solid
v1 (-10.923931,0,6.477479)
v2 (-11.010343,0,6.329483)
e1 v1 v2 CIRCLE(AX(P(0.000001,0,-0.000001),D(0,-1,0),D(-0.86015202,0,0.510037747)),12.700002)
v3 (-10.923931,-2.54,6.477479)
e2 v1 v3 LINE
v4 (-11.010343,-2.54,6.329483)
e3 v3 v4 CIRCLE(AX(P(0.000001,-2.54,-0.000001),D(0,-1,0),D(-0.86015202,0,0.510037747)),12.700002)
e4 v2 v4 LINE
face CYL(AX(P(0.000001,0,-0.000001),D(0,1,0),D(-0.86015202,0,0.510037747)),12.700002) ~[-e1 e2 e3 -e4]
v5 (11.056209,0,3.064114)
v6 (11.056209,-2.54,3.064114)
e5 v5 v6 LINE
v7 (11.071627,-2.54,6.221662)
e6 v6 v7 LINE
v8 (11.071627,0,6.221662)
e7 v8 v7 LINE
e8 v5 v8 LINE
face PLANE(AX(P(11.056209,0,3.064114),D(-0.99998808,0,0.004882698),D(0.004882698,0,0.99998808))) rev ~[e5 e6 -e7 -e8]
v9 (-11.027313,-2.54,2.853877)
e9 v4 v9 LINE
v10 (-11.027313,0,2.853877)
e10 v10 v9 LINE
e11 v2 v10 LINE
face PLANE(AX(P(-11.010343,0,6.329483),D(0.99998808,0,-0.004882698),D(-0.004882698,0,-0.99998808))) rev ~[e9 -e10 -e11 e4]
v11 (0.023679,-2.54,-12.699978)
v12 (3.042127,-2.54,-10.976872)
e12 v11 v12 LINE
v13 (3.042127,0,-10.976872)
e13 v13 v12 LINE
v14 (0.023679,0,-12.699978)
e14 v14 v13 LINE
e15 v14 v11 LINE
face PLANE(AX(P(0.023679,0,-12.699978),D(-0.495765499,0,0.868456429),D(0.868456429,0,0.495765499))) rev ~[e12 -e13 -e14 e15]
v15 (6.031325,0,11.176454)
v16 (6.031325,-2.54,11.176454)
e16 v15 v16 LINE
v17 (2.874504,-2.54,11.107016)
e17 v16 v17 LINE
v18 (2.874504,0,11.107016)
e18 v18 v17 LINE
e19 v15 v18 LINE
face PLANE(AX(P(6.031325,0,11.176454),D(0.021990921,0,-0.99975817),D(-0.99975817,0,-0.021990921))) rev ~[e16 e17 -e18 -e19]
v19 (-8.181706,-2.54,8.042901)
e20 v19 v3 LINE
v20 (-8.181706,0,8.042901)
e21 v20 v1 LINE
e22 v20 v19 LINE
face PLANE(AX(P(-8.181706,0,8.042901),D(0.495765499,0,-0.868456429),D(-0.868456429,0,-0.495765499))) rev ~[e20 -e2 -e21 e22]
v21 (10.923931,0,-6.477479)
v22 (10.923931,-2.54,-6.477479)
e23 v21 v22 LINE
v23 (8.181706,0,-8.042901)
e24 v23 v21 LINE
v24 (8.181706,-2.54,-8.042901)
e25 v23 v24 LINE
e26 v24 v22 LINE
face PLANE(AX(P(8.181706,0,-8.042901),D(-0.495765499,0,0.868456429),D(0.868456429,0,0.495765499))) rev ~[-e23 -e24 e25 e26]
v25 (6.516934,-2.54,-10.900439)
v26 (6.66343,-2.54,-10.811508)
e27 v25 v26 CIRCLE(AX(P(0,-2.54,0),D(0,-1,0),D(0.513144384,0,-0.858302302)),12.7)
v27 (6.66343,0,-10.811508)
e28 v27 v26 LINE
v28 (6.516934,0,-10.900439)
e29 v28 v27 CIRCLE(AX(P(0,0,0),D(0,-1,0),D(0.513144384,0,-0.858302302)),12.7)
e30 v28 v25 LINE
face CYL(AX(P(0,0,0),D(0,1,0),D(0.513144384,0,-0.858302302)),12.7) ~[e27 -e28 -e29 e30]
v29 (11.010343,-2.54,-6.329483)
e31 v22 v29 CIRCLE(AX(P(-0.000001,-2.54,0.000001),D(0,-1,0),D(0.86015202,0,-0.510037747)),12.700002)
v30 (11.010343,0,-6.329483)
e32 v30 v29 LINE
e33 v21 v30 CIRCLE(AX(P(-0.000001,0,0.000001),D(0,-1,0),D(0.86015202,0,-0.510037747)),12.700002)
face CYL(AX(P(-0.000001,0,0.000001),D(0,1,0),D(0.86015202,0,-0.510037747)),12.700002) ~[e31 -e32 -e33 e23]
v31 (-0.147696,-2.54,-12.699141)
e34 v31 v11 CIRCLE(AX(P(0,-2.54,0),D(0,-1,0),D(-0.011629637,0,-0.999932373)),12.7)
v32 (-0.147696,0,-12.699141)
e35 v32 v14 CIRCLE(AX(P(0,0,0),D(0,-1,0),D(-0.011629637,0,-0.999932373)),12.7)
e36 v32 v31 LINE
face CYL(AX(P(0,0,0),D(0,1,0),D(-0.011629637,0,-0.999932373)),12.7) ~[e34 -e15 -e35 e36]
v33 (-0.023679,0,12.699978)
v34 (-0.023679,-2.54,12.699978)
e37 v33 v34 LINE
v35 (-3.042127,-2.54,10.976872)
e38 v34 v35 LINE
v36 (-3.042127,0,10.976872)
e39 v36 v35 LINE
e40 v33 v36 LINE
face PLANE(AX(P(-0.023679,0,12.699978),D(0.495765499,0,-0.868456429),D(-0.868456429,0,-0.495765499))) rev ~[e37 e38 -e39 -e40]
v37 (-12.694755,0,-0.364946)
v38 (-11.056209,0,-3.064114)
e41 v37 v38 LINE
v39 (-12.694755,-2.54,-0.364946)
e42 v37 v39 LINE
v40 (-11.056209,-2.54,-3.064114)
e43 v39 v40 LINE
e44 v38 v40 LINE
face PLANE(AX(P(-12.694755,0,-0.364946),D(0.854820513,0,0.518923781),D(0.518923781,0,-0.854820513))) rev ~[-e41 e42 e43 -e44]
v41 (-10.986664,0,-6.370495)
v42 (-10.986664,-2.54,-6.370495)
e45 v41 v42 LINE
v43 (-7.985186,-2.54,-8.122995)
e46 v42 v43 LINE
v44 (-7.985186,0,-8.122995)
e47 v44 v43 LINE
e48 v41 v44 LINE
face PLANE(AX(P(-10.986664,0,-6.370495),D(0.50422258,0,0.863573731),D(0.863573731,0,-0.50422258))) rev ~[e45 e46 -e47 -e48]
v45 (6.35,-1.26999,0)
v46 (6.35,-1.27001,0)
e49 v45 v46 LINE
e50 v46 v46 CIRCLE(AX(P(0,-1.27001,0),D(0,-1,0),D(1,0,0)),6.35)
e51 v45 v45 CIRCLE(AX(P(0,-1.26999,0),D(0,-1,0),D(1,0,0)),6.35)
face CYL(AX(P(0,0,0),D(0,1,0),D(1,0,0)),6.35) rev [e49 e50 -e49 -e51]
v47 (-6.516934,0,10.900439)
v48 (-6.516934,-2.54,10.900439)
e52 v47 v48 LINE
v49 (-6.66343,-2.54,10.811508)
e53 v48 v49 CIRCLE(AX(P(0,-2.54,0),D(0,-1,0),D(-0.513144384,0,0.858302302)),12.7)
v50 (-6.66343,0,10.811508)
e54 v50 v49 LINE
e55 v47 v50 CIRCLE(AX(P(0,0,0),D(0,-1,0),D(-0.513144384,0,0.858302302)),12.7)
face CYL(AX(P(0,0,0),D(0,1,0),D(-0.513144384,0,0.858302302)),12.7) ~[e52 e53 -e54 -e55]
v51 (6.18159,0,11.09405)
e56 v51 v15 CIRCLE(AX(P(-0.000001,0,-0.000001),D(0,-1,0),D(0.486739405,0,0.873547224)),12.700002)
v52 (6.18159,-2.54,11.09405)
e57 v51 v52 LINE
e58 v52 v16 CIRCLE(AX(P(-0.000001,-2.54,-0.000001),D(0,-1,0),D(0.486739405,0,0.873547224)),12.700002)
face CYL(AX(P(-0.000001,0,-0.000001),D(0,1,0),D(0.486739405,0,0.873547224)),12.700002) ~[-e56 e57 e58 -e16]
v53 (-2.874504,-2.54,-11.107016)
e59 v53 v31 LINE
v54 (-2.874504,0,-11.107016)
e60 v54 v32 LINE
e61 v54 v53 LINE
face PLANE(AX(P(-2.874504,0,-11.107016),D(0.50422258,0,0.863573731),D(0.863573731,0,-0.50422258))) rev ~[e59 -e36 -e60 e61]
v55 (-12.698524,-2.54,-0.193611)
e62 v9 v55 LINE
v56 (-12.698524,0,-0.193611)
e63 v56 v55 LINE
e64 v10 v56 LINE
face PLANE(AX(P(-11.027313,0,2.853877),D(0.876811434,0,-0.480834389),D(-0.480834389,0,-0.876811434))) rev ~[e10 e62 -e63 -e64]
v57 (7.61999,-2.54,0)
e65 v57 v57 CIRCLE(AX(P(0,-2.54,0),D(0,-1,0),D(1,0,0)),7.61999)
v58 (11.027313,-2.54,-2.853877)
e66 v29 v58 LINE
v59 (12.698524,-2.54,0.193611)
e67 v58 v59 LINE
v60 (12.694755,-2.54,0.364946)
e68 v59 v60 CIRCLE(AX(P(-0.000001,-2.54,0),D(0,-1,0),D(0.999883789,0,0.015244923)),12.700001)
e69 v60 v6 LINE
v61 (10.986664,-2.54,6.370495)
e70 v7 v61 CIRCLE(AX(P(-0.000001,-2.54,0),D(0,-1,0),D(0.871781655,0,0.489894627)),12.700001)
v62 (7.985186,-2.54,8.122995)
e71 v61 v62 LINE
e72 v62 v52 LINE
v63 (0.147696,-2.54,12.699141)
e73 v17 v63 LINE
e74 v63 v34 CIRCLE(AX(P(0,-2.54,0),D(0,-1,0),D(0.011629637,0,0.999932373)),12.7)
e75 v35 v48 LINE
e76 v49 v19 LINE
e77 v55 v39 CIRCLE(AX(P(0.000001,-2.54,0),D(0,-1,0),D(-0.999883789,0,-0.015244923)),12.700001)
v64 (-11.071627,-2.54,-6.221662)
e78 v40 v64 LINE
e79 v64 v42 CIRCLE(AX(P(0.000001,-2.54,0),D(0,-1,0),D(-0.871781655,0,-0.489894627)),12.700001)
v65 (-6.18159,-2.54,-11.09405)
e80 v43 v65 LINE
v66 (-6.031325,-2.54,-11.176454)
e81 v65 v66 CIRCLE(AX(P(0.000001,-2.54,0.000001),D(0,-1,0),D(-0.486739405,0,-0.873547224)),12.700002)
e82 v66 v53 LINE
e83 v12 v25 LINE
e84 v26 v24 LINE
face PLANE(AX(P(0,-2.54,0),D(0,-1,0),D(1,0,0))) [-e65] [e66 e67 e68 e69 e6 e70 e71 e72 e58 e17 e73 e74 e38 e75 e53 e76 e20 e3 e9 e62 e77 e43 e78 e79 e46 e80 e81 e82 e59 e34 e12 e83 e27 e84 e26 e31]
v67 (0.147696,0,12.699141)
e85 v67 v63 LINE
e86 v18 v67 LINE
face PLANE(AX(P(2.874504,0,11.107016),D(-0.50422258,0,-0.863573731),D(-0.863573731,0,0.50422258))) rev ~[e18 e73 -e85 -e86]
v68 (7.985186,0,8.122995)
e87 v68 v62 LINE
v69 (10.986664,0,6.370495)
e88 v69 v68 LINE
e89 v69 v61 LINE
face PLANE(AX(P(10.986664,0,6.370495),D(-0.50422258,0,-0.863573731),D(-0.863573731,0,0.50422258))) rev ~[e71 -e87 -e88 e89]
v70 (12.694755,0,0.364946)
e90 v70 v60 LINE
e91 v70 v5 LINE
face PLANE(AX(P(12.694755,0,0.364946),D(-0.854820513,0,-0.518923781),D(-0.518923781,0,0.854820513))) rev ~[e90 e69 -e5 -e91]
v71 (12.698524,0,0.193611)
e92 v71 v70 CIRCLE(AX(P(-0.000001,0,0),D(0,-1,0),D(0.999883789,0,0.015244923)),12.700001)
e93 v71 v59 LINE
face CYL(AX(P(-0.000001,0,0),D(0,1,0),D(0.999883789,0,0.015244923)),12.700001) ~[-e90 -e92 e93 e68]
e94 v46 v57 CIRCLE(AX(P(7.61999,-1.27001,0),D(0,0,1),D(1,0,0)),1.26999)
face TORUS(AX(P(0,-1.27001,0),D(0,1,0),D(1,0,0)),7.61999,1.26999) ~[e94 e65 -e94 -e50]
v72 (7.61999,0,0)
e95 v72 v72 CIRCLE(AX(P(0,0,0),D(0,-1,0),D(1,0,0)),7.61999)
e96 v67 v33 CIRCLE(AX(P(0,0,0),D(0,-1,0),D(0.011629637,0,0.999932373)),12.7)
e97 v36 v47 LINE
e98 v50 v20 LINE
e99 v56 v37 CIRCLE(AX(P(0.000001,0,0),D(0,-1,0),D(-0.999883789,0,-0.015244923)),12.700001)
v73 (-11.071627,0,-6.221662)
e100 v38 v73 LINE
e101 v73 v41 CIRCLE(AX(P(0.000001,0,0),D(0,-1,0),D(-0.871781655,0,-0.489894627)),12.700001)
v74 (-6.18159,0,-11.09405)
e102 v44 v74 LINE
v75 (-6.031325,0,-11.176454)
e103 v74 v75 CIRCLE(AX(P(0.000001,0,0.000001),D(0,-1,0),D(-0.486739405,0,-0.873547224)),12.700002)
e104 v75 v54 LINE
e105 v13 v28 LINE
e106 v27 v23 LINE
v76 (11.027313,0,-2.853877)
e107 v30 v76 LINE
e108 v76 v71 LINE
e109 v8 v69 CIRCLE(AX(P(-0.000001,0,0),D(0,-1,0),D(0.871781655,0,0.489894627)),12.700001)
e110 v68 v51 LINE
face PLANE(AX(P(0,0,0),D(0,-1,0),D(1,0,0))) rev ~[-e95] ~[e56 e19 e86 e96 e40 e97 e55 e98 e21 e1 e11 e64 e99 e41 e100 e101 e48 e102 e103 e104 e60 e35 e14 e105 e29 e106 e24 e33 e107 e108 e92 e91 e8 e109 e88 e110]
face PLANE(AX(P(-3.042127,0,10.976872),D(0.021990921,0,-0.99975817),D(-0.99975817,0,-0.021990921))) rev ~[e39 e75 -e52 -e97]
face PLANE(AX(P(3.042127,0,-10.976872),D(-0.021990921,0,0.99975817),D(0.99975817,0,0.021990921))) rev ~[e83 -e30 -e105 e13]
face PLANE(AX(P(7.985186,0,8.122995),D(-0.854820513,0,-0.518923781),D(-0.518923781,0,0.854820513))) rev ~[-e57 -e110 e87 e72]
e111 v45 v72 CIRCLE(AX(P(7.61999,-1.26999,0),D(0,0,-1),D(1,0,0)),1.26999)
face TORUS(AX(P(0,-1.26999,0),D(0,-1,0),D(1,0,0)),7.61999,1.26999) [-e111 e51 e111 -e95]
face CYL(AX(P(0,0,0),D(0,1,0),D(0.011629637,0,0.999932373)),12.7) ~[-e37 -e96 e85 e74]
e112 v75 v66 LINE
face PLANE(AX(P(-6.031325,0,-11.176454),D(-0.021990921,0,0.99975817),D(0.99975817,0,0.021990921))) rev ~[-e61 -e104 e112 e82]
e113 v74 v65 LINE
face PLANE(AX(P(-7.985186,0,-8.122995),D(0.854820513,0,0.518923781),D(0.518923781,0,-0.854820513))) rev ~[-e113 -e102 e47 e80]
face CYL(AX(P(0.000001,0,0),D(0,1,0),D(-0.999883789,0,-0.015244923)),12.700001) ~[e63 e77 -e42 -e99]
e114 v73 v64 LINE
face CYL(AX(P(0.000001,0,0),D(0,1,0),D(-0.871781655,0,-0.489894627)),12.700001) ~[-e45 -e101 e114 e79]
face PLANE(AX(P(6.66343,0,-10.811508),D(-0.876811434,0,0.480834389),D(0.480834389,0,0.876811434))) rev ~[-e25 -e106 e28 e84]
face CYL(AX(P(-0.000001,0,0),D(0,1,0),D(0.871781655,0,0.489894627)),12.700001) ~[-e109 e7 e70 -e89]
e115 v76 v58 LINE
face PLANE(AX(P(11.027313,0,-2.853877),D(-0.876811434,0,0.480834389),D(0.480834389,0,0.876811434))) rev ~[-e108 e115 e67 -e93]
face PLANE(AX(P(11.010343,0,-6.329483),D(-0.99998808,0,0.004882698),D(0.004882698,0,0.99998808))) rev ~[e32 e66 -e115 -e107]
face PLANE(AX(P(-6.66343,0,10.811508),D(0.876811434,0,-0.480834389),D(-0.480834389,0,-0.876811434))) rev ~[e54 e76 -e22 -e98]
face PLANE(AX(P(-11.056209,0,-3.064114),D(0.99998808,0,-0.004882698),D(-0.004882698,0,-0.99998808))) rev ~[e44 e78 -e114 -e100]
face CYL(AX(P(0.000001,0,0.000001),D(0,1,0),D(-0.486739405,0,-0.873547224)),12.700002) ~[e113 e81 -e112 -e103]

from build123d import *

# Parameters (mm, degrees)
F0_R     = 6.35
F1_DEPTH = 2.54
F2_R     = 1.26999


# Not quite as in the source:
# - a fillet or chamfer is up to 0.001 mm smaller than in the source, because OpenCascade refuses the exact size


with BuildPart() as f1:
    # F0 (on Front) → F1 (new body)
    with BuildSketch(Plane.XZ):
        Polygon((8.1817057439, -8.042901042), (11.0273133855, -2.8538767742), (11.0562094944, 3.0641144995), (7.9851864785, 8.1229951402), (2.8745037505, 11.1070155415), (-3.042126907, 10.9768719144), (-8.1817057439, 8.042901042), (-11.0273133855, 2.8538767742), (-11.0562094944, -3.0641144995), (-7.9851864785, -8.1229951402), (-2.8745037505, -11.1070155415), (3.042126907, -10.9768719144), align=None)
        Circle(F0_R, mode=Mode.SUBTRACT)
        with BuildLine():
            Line((-3.042126907, 10.9768719144), (2.8745037505, 11.1070155415))
            Line((2.8745037505, 11.1070155415), (0.1476963834, 12.6991411433))
            ThreePointArc((0.1476963834, 12.6991411433), (0.0620102654, 12.6998486104), (-0.0236786756, 12.699977926))
            Line((-0.0236786756, 12.699977926), (-3.042126907, 10.9768719144))
        make_face()
        with BuildLine():
            Line((-8.1817057439, 8.042901042), (-3.042126907, 10.9768719144))
            Line((-3.042126907, 10.9768719144), (-6.5169336782, 10.9004392312))
            ThreePointArc((-6.5169336782, 10.9004392312), (-6.5903320193, 10.8562205152), (-6.6634303404, 10.8115075775))
            Line((-6.6634303404, 10.8115075775), (-8.1817057439, 8.042901042))
        make_face()
        with BuildLine():
            Line((-11.0273133855, 2.8538767742), (-8.1817057439, 8.042901042))
            Line((-8.1817057439, 8.042901042), (-10.9239306447, 6.4774793917))
            ThreePointArc((-10.9239306447, 6.4774793917), (-10.9673863881, 6.4036267703), (-11.0103428492, 6.3294826284))
            Line((-11.0103428492, 6.3294826284), (-11.0273133855, 2.8538767742))
        make_face()
        with BuildLine():
            Line((-12.6947553855, -0.3649461623), (-11.0562094944, -3.0641144995))
            Line((-11.0562094944, -3.0641144995), (-11.0273133855, 2.8538767742))
            Line((-11.0273133855, 2.8538767742), (-12.6985241258, -0.1936105045))
            ThreePointArc((-12.6985241258, -0.1936105045), (-12.6969287649, -0.2792846905), (-12.6947553855, -0.3649461623))
        make_face()
        with BuildLine():
            Line((-10.9866641736, -6.3704952976), (-7.9851864785, -8.1229951402))
            Line((-7.9851864785, -8.1229951402), (-11.0562094944, -3.0641144995))
            Line((-11.0562094944, -3.0641144995), (-11.0716270281, -6.2216617516))
            ThreePointArc((-11.0716270281, -6.2216617516), (-11.0293966535, -6.2962218401), (-10.9866641736, -6.3704952976))
        make_face()
        with BuildLine():
            Line((-6.0313250452, -11.1764537399), (-2.8745037505, -11.1070155415))
            Line((-2.8745037505, -11.1070155415), (-7.9851864785, -8.1229951402))
            Line((-7.9851864785, -8.1229951402), (-6.1815904476, -11.0940497357))
            ThreePointArc((-6.1815904476, -11.0940497357), (-6.1065967456, -11.1355052057), (-6.0313250452, -11.1764537399))
        make_face()
        with BuildLine():
            Line((0.0236786756, -12.699977926), (3.042126907, -10.9768719144))
            Line((3.042126907, -10.9768719144), (-2.8745037505, -11.1070155415))
            Line((-2.8745037505, -11.1070155415), (-0.1476963834, -12.6991411433))
            ThreePointArc((-0.1476963834, -12.6991411433), (-0.0620102654, -12.6998486104), (0.0236786756, -12.699977926))
        make_face()
        with BuildLine():
            Line((6.6634303404, -10.8115075775), (8.1817057439, -8.042901042))
            Line((8.1817057439, -8.042901042), (3.042126907, -10.9768719144))
            Line((3.042126907, -10.9768719144), (6.5169336782, -10.9004392312))
            ThreePointArc((6.5169336782, -10.9004392312), (6.5903320193, -10.8562205152), (6.6634303404, -10.8115075775))
        make_face()
        with BuildLine():
            ThreePointArc((10.9239306447, -6.4774793917), (10.9673863881, -6.4036267703), (11.0103428492, -6.3294826284))
            Line((11.0103428492, -6.3294826284), (11.0273133855, -2.8538767742))
            Line((11.0273133855, -2.8538767742), (8.1817057439, -8.042901042))
            Line((8.1817057439, -8.042901042), (10.9239306447, -6.4774793917))
        make_face()
        with BuildLine():
            Line((11.0273133855, -2.8538767742), (12.6985241258, 0.1936105045))
            ThreePointArc((12.6985241258, 0.1936105045), (12.6969287649, 0.2792846905), (12.6947553855, 0.3649461623))
            Line((12.6947553855, 0.3649461623), (11.0562094944, 3.0641144995))
            Line((11.0562094944, 3.0641144995), (11.0273133855, -2.8538767742))
        make_face()
        with BuildLine():
            Line((11.0562094944, 3.0641144995), (11.0716270281, 6.2216617516))
            ThreePointArc((11.0716270281, 6.2216617516), (11.0293966535, 6.2962218401), (10.9866641736, 6.3704952976))
            Line((10.9866641736, 6.3704952976), (7.9851864785, 8.1229951402))
            Line((7.9851864785, 8.1229951402), (11.0562094944, 3.0641144995))
        make_face()
        with BuildLine():
            Line((2.8745037505, 11.1070155415), (7.9851864785, 8.1229951402))
            Line((7.9851864785, 8.1229951402), (6.1815904476, 11.0940497357))
            ThreePointArc((6.1815904476, 11.0940497357), (6.1065967456, 11.1355052057), (6.0313250452, 11.1764537399))
            Line((6.0313250452, 11.1764537399), (2.8745037505, 11.1070155415))
        make_face()
    extrude(amount=F1_DEPTH)

    # F2 (radius 1.27 in the source; OpenCascade refuses exactly that, so slightly less here)
    f2_edges = [f1.edges().sort_by_distance(p)[0] for p in [
        (-6.35, -2.54, 0),
        (-6.35, 0, 0),
    ]]
    fillet(f2_edges, radius=F2_R)


solid = f1.part
